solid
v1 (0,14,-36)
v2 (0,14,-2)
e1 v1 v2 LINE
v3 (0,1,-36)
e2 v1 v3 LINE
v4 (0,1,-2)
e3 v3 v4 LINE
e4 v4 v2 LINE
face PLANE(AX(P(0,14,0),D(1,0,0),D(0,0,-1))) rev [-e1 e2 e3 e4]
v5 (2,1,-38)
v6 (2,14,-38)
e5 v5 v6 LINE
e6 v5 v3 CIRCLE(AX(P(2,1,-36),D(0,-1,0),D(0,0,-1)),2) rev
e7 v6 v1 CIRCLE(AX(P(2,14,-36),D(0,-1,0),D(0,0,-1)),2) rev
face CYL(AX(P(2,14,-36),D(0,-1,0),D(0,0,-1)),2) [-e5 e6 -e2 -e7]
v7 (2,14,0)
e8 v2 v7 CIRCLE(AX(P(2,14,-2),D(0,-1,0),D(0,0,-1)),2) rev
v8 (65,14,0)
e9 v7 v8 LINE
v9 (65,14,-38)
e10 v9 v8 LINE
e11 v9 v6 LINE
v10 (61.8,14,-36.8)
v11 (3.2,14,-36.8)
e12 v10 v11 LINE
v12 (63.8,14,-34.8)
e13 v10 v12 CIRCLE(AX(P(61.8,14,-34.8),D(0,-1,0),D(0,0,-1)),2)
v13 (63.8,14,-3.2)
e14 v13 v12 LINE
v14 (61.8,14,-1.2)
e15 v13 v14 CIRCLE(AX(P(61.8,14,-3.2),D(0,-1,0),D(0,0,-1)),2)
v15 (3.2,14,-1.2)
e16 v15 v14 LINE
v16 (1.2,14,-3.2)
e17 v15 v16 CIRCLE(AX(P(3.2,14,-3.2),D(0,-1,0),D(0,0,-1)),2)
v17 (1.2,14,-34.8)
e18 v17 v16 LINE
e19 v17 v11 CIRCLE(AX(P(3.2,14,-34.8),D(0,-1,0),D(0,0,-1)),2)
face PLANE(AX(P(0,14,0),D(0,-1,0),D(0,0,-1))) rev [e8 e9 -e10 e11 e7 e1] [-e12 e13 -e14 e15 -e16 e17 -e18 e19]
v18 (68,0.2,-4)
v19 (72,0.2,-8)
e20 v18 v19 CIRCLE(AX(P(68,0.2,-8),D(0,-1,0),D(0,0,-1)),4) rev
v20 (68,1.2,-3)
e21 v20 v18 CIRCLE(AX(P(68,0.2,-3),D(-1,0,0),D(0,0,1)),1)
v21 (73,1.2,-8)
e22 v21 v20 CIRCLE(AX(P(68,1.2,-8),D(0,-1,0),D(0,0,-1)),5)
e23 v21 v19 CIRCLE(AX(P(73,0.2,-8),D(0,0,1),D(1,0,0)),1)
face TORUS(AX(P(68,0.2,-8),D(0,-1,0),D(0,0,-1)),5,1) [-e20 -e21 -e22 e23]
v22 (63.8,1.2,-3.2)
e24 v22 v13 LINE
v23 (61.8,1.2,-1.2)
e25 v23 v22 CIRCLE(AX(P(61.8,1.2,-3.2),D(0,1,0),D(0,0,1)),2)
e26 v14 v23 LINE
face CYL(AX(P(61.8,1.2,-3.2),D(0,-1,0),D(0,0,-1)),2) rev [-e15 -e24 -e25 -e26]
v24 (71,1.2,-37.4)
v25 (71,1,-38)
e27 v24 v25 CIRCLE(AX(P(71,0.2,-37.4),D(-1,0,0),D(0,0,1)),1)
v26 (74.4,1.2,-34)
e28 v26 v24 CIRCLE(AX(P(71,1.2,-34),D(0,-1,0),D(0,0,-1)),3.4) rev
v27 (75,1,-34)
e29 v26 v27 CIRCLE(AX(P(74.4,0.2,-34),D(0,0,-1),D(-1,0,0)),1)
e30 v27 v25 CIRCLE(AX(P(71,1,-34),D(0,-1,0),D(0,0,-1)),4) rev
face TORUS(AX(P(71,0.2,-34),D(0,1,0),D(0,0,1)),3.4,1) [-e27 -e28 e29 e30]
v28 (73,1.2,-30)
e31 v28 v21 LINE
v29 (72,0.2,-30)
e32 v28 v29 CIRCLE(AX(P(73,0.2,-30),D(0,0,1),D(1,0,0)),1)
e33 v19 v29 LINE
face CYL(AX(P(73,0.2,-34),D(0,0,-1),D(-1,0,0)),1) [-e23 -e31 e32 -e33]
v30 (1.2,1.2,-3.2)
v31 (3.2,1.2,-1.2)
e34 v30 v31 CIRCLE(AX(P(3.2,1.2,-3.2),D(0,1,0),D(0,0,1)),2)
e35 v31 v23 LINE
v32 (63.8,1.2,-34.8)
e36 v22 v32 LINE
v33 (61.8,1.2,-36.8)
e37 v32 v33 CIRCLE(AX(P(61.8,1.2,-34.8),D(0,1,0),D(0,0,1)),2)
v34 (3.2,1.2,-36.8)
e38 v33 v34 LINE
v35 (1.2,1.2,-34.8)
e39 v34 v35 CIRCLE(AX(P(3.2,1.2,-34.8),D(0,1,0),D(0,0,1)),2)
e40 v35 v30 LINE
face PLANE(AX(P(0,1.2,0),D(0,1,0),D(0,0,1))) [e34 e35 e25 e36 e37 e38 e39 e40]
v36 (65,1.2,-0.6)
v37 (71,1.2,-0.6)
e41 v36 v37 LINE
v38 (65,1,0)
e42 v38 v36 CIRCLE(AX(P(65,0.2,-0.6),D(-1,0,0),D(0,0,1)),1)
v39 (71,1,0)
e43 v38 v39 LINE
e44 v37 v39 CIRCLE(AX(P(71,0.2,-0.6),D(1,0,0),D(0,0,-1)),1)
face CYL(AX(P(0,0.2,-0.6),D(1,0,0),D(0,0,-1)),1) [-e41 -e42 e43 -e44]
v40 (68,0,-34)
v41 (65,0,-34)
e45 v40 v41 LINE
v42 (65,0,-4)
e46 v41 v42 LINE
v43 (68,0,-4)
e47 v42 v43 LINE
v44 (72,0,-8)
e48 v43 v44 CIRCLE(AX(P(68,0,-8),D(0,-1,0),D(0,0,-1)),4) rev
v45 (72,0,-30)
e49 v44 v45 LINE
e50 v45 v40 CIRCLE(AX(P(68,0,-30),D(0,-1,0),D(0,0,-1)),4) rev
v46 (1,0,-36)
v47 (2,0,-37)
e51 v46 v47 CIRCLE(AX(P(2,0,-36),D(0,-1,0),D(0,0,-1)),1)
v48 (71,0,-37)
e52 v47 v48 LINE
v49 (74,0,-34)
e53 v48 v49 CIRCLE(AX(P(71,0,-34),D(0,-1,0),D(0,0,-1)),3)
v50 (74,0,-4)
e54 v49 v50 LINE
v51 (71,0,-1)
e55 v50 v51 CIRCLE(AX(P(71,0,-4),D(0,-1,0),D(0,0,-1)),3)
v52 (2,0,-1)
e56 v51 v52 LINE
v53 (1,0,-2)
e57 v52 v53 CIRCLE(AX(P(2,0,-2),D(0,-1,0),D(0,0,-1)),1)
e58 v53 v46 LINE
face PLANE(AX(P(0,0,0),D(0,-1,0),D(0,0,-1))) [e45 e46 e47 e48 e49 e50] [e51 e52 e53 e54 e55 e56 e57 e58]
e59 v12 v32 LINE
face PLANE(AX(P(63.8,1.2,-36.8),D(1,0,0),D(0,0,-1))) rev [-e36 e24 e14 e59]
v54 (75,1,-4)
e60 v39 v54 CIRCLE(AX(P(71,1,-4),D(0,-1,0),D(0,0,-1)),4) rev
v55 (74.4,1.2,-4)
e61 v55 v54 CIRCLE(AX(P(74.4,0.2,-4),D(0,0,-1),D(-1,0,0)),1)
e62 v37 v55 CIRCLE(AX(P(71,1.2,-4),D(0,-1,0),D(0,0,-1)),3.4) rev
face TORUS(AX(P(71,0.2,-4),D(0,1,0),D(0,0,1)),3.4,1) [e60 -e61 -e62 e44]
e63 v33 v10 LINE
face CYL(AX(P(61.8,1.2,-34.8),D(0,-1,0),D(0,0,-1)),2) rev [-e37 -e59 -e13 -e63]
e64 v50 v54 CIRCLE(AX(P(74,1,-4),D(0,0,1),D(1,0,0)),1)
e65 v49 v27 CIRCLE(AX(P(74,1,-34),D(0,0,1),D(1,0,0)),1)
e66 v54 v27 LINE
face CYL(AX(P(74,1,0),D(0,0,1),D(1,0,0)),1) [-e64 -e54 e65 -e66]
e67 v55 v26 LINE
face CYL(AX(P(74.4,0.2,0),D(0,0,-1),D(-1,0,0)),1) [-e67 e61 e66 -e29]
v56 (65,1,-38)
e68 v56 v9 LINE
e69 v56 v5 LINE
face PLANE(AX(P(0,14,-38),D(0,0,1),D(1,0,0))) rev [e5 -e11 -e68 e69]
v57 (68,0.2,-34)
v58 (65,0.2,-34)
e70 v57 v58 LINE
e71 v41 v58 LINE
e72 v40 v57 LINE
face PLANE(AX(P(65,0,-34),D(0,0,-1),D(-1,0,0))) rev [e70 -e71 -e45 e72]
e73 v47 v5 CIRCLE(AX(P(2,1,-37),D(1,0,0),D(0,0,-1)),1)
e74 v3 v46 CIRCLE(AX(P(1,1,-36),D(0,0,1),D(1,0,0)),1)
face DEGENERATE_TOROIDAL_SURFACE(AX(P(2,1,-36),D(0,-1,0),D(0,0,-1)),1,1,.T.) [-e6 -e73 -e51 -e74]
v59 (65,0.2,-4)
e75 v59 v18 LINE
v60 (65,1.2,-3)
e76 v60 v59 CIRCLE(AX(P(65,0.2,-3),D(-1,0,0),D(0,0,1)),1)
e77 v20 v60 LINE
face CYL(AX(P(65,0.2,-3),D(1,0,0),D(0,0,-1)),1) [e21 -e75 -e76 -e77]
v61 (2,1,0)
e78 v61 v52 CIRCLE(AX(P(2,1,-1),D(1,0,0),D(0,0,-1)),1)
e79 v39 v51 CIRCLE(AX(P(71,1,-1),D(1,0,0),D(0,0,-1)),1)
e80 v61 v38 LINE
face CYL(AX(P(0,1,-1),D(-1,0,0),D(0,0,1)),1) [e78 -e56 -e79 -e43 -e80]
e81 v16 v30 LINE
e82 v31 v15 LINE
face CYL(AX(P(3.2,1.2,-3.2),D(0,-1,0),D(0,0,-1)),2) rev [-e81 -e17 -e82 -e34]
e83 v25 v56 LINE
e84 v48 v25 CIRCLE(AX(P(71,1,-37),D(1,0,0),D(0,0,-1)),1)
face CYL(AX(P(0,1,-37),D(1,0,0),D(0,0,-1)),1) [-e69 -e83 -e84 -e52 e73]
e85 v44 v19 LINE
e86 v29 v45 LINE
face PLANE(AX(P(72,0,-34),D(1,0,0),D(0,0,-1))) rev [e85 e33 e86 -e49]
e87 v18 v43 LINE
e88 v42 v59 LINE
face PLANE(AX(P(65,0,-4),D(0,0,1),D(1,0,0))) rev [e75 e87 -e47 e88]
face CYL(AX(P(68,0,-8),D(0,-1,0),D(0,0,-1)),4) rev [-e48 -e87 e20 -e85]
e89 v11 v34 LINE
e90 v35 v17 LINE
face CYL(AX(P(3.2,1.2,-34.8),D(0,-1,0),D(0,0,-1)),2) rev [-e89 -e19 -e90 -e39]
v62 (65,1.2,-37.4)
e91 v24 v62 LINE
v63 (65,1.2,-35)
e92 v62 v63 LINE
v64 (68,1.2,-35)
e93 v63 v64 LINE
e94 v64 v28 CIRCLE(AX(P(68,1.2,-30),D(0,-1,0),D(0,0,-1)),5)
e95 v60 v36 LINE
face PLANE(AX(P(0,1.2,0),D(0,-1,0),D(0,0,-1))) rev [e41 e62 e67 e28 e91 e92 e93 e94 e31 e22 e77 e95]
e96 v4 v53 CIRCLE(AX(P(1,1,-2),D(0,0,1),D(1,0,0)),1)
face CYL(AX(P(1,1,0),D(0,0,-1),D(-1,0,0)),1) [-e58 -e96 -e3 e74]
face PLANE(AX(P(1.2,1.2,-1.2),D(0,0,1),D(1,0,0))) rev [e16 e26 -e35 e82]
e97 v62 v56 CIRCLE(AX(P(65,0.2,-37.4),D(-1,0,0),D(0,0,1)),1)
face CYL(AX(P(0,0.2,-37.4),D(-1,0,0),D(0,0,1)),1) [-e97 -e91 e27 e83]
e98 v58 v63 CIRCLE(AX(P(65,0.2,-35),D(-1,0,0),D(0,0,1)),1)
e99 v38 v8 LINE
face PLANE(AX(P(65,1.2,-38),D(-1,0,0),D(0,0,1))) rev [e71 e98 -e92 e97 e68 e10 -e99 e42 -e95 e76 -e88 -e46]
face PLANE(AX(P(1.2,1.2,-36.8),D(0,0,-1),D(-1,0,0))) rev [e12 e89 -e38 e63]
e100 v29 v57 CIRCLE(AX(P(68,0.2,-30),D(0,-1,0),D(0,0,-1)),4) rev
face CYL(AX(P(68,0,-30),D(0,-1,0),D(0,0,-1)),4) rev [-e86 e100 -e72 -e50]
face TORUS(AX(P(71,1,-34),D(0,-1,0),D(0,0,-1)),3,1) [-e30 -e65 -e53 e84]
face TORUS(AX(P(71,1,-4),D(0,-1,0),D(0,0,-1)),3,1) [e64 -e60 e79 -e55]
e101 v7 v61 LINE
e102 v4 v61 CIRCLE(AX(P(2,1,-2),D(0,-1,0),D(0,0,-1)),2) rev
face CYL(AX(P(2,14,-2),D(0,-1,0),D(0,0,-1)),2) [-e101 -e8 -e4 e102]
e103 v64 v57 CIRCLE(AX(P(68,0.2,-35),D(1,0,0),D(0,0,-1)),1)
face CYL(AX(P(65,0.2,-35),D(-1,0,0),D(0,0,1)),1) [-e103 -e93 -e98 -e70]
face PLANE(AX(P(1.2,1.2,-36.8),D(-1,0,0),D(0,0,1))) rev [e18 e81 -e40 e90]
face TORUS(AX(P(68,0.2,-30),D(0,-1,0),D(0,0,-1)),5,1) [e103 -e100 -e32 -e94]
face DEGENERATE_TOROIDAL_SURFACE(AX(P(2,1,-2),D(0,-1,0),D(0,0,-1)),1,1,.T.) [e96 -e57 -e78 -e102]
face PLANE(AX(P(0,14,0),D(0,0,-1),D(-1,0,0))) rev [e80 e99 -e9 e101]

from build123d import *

# Parameters (mm, degrees)
SKETCH_1_W          = 75
SKETCH_1_H          = 38
EXTRUDE_1_DEPTH     = 14
SKETCH_2_W          = 10
SKETCH_2_H          = 38
CUT_EXTRUDE_1_DEPTH = 12.8
SKETCH_3_W          = 7
SKETCH_3_H          = 30
CUT_EXTRUDE_2_DEPTH = 1.2
FILLET_2_R          = 4
SKETCH_5_W          = 62.6
SKETCH_5_H          = 35.6
CUT_EXTRUDE_4_DEPTH = 12.8
FILLET_3_R          = 2
FILLET_4_R          = 2
FILLET_6_R          = 1
FILLET_7_R          = 1
FILLET_8_R          = 1


with BuildPart() as part:
    # Эскиз1 → Бобышка-Вытянуть1 (new body)
    with BuildSketch(Plane(origin=(0, 0, 0), x_dir=(1, 0, 0), z_dir=(0, 1, 0))):
        with Locations((37.5, 19)):
            Rectangle(SKETCH_1_W, SKETCH_1_H)
    extrude(amount=EXTRUDE_1_DEPTH)

    # Эскиз2 → Вырез-Вытянуть1 (cut)
    with BuildSketch(Plane(origin=(0, 14, 0), x_dir=(1, 0, 0), z_dir=(0, 1, 0))):
        with Locations((70, 19)):
            Rectangle(SKETCH_2_W, SKETCH_2_H)
    extrude(amount=-CUT_EXTRUDE_1_DEPTH, mode=Mode.SUBTRACT)

    # Эскиз3 → Вырез-Вытянуть2 (cut)
    with BuildSketch(Plane(origin=(0, 1.2, 0), x_dir=(1, 0, 0), z_dir=(0, 1, 0))):
        with Locations((68.5, 19)):
            Rectangle(SKETCH_3_W, SKETCH_3_H)
    extrude(amount=-CUT_EXTRUDE_2_DEPTH, mode=Mode.SUBTRACT)

    # Скругление2
    fillet_2_edges = [part.edges().sort_by_distance(p)[0] for p in [
        (75, 0.6, -38),
        (75, 0.6, 0),
        (72, 0.6, -34),
        (72, 0.6, -4),
    ]]
    fillet(fillet_2_edges, radius=FILLET_2_R)

    # Эскиз5 → Вырез-Вытянуть4 (cut)
    with BuildSketch(Plane(origin=(0, 14, 0), x_dir=(1, 0, 0), z_dir=(0, 1, 0))):
        with Locations((32.5, 19)):
            Rectangle(SKETCH_5_W, SKETCH_5_H)
    extrude(amount=-CUT_EXTRUDE_4_DEPTH, mode=Mode.SUBTRACT)

    # Скругление3
    fillet_3_edges = [part.edges().sort_by_distance(p)[0] for p in [
        (0, 7, -38),
        (0, 7, 0),
    ]]
    fillet(fillet_3_edges, radius=FILLET_3_R)

    # Скругление4
    fillet_4_edges = [part.edges().sort_by_distance(p)[0] for p in [
        (1.2, 7.6, -1.2),
        (1.2, 7.6, -36.8),
        (63.8, 7.6, -36.8),
        (63.8, 7.6, -1.2),
    ]]
    fillet(fillet_4_edges, radius=FILLET_4_R)

    # Скругление6
    fillet_6_edges = [part.edges().sort_by_distance(p)[0] for p in [
        (36.5, 0, -38),
        (75, 0, -19),
        (73.828427125, 0, -1.171572875),
        (73.828427125, 0, -36.828427125),
        (0, 0, -19),
        (36.5, 0, 0),
        (0.585786438, 0, -0.585786438),
        (0.585786438, 0, -37.414213562),
    ]]
    fillet(fillet_6_edges, radius=FILLET_6_R)

    # Скругление7
    fillet_7_edges = [part.edges().sort_by_distance(p)[0] for p in [
        (66.5, 1.2, -4),
        (72, 1.2, -19),
        (66.5, 1.2, -34),
        (70.828427125, 1.2, -5.171572875),
        (70.828427125, 1.2, -32.828427125),
    ]]
    fillet(fillet_7_edges, radius=FILLET_7_R)

    # Скругление8
    # the kernel refuses this fillet: 1 mm, written as the material it takes off along each edge
    with BuildSketch(Plane(origin=(71, 1.2, -38), x_dir=(0, 0, 1), z_dir=(-1, 0, 0)), Plane(origin=(65, 1.2, 0), x_dir=(0, 0, -1), z_dir=(1, 0, 0))) as fillet_8_piece_1:
        with BuildLine():
            CenterArc((0.6, -1), FILLET_8_R, 90, 36.869897646)
            Line((0, -0.2), (-0.012, -0.184))
            ThreePointArc((-0.012, -0.184), (-0.02, -0.1), (-0.02, 0))
            Line((-0.02, 0), (0, 0.02))
            Line((0, 0.02), (0.6, 0.02))
            Line((0.6, 0.02), (0.6, 0))
        make_face()
    extrude(amount=6, mode=Mode.SUBTRACT)
    with BuildSketch(Plane(origin=(71, 1.2, -34), x_dir=(1, 0, 0), z_dir=(0, 0, 1))) as fillet_8_piece_2:
        with BuildLine():
            CenterArc((3.4, -1), FILLET_8_R, 53.130102354, 36.869897646)
            Line((4, -0.2), (4.012, -0.184))
            ThreePointArc((4.012, -0.184), (4.02, -0.1), (4.02, 0))
            Line((4.02, 0), (4, 0.02))
            Line((4, 0.02), (3.4, 0.02))
            Line((3.4, 0.02), (3.4, 0))
        make_face()
    revolve(axis=Axis((71, 1.2, -34), (0, 1, 0)), revolution_arc=90, mode=Mode.SUBTRACT)
    with BuildSketch(Plane(origin=(75, 1.2, -4), x_dir=(-1, 0, 0), z_dir=(0, 0, -1))) as fillet_8_piece_3:
        with BuildLine():
            CenterArc((0.6, -1), FILLET_8_R, 90, 36.869897646)
            Line((0, -0.2), (-0.012, -0.184))
            ThreePointArc((-0.012, -0.184), (-0.02, -0.1), (-0.02, 0))
            Line((-0.02, 0), (0, 0.02))
            Line((0, 0.02), (0.6, 0.02))
            Line((0.6, 0.02), (0.6, 0))
        make_face()
    extrude(amount=30, mode=Mode.SUBTRACT)
    with BuildSketch(Plane(origin=(71, 1.2, -4), x_dir=(0, 0, 1), z_dir=(-1, 0, 0))) as fillet_8_piece_4:
        with BuildLine():
            CenterArc((3.4, -1), FILLET_8_R, 53.130102354, 36.869897646)
            Line((4, -0.2), (4.012, -0.184))
            ThreePointArc((4.012, -0.184), (4.02, -0.1), (4.02, 0))
            Line((4.02, 0), (4, 0.02))
            Line((4, 0.02), (3.4, 0.02))
            Line((3.4, 0.02), (3.4, 0))
        make_face()
    revolve(axis=Axis((71, 1.2, -4), (0, 1, 0)), revolution_arc=90, mode=Mode.SUBTRACT)


solid = part.part
